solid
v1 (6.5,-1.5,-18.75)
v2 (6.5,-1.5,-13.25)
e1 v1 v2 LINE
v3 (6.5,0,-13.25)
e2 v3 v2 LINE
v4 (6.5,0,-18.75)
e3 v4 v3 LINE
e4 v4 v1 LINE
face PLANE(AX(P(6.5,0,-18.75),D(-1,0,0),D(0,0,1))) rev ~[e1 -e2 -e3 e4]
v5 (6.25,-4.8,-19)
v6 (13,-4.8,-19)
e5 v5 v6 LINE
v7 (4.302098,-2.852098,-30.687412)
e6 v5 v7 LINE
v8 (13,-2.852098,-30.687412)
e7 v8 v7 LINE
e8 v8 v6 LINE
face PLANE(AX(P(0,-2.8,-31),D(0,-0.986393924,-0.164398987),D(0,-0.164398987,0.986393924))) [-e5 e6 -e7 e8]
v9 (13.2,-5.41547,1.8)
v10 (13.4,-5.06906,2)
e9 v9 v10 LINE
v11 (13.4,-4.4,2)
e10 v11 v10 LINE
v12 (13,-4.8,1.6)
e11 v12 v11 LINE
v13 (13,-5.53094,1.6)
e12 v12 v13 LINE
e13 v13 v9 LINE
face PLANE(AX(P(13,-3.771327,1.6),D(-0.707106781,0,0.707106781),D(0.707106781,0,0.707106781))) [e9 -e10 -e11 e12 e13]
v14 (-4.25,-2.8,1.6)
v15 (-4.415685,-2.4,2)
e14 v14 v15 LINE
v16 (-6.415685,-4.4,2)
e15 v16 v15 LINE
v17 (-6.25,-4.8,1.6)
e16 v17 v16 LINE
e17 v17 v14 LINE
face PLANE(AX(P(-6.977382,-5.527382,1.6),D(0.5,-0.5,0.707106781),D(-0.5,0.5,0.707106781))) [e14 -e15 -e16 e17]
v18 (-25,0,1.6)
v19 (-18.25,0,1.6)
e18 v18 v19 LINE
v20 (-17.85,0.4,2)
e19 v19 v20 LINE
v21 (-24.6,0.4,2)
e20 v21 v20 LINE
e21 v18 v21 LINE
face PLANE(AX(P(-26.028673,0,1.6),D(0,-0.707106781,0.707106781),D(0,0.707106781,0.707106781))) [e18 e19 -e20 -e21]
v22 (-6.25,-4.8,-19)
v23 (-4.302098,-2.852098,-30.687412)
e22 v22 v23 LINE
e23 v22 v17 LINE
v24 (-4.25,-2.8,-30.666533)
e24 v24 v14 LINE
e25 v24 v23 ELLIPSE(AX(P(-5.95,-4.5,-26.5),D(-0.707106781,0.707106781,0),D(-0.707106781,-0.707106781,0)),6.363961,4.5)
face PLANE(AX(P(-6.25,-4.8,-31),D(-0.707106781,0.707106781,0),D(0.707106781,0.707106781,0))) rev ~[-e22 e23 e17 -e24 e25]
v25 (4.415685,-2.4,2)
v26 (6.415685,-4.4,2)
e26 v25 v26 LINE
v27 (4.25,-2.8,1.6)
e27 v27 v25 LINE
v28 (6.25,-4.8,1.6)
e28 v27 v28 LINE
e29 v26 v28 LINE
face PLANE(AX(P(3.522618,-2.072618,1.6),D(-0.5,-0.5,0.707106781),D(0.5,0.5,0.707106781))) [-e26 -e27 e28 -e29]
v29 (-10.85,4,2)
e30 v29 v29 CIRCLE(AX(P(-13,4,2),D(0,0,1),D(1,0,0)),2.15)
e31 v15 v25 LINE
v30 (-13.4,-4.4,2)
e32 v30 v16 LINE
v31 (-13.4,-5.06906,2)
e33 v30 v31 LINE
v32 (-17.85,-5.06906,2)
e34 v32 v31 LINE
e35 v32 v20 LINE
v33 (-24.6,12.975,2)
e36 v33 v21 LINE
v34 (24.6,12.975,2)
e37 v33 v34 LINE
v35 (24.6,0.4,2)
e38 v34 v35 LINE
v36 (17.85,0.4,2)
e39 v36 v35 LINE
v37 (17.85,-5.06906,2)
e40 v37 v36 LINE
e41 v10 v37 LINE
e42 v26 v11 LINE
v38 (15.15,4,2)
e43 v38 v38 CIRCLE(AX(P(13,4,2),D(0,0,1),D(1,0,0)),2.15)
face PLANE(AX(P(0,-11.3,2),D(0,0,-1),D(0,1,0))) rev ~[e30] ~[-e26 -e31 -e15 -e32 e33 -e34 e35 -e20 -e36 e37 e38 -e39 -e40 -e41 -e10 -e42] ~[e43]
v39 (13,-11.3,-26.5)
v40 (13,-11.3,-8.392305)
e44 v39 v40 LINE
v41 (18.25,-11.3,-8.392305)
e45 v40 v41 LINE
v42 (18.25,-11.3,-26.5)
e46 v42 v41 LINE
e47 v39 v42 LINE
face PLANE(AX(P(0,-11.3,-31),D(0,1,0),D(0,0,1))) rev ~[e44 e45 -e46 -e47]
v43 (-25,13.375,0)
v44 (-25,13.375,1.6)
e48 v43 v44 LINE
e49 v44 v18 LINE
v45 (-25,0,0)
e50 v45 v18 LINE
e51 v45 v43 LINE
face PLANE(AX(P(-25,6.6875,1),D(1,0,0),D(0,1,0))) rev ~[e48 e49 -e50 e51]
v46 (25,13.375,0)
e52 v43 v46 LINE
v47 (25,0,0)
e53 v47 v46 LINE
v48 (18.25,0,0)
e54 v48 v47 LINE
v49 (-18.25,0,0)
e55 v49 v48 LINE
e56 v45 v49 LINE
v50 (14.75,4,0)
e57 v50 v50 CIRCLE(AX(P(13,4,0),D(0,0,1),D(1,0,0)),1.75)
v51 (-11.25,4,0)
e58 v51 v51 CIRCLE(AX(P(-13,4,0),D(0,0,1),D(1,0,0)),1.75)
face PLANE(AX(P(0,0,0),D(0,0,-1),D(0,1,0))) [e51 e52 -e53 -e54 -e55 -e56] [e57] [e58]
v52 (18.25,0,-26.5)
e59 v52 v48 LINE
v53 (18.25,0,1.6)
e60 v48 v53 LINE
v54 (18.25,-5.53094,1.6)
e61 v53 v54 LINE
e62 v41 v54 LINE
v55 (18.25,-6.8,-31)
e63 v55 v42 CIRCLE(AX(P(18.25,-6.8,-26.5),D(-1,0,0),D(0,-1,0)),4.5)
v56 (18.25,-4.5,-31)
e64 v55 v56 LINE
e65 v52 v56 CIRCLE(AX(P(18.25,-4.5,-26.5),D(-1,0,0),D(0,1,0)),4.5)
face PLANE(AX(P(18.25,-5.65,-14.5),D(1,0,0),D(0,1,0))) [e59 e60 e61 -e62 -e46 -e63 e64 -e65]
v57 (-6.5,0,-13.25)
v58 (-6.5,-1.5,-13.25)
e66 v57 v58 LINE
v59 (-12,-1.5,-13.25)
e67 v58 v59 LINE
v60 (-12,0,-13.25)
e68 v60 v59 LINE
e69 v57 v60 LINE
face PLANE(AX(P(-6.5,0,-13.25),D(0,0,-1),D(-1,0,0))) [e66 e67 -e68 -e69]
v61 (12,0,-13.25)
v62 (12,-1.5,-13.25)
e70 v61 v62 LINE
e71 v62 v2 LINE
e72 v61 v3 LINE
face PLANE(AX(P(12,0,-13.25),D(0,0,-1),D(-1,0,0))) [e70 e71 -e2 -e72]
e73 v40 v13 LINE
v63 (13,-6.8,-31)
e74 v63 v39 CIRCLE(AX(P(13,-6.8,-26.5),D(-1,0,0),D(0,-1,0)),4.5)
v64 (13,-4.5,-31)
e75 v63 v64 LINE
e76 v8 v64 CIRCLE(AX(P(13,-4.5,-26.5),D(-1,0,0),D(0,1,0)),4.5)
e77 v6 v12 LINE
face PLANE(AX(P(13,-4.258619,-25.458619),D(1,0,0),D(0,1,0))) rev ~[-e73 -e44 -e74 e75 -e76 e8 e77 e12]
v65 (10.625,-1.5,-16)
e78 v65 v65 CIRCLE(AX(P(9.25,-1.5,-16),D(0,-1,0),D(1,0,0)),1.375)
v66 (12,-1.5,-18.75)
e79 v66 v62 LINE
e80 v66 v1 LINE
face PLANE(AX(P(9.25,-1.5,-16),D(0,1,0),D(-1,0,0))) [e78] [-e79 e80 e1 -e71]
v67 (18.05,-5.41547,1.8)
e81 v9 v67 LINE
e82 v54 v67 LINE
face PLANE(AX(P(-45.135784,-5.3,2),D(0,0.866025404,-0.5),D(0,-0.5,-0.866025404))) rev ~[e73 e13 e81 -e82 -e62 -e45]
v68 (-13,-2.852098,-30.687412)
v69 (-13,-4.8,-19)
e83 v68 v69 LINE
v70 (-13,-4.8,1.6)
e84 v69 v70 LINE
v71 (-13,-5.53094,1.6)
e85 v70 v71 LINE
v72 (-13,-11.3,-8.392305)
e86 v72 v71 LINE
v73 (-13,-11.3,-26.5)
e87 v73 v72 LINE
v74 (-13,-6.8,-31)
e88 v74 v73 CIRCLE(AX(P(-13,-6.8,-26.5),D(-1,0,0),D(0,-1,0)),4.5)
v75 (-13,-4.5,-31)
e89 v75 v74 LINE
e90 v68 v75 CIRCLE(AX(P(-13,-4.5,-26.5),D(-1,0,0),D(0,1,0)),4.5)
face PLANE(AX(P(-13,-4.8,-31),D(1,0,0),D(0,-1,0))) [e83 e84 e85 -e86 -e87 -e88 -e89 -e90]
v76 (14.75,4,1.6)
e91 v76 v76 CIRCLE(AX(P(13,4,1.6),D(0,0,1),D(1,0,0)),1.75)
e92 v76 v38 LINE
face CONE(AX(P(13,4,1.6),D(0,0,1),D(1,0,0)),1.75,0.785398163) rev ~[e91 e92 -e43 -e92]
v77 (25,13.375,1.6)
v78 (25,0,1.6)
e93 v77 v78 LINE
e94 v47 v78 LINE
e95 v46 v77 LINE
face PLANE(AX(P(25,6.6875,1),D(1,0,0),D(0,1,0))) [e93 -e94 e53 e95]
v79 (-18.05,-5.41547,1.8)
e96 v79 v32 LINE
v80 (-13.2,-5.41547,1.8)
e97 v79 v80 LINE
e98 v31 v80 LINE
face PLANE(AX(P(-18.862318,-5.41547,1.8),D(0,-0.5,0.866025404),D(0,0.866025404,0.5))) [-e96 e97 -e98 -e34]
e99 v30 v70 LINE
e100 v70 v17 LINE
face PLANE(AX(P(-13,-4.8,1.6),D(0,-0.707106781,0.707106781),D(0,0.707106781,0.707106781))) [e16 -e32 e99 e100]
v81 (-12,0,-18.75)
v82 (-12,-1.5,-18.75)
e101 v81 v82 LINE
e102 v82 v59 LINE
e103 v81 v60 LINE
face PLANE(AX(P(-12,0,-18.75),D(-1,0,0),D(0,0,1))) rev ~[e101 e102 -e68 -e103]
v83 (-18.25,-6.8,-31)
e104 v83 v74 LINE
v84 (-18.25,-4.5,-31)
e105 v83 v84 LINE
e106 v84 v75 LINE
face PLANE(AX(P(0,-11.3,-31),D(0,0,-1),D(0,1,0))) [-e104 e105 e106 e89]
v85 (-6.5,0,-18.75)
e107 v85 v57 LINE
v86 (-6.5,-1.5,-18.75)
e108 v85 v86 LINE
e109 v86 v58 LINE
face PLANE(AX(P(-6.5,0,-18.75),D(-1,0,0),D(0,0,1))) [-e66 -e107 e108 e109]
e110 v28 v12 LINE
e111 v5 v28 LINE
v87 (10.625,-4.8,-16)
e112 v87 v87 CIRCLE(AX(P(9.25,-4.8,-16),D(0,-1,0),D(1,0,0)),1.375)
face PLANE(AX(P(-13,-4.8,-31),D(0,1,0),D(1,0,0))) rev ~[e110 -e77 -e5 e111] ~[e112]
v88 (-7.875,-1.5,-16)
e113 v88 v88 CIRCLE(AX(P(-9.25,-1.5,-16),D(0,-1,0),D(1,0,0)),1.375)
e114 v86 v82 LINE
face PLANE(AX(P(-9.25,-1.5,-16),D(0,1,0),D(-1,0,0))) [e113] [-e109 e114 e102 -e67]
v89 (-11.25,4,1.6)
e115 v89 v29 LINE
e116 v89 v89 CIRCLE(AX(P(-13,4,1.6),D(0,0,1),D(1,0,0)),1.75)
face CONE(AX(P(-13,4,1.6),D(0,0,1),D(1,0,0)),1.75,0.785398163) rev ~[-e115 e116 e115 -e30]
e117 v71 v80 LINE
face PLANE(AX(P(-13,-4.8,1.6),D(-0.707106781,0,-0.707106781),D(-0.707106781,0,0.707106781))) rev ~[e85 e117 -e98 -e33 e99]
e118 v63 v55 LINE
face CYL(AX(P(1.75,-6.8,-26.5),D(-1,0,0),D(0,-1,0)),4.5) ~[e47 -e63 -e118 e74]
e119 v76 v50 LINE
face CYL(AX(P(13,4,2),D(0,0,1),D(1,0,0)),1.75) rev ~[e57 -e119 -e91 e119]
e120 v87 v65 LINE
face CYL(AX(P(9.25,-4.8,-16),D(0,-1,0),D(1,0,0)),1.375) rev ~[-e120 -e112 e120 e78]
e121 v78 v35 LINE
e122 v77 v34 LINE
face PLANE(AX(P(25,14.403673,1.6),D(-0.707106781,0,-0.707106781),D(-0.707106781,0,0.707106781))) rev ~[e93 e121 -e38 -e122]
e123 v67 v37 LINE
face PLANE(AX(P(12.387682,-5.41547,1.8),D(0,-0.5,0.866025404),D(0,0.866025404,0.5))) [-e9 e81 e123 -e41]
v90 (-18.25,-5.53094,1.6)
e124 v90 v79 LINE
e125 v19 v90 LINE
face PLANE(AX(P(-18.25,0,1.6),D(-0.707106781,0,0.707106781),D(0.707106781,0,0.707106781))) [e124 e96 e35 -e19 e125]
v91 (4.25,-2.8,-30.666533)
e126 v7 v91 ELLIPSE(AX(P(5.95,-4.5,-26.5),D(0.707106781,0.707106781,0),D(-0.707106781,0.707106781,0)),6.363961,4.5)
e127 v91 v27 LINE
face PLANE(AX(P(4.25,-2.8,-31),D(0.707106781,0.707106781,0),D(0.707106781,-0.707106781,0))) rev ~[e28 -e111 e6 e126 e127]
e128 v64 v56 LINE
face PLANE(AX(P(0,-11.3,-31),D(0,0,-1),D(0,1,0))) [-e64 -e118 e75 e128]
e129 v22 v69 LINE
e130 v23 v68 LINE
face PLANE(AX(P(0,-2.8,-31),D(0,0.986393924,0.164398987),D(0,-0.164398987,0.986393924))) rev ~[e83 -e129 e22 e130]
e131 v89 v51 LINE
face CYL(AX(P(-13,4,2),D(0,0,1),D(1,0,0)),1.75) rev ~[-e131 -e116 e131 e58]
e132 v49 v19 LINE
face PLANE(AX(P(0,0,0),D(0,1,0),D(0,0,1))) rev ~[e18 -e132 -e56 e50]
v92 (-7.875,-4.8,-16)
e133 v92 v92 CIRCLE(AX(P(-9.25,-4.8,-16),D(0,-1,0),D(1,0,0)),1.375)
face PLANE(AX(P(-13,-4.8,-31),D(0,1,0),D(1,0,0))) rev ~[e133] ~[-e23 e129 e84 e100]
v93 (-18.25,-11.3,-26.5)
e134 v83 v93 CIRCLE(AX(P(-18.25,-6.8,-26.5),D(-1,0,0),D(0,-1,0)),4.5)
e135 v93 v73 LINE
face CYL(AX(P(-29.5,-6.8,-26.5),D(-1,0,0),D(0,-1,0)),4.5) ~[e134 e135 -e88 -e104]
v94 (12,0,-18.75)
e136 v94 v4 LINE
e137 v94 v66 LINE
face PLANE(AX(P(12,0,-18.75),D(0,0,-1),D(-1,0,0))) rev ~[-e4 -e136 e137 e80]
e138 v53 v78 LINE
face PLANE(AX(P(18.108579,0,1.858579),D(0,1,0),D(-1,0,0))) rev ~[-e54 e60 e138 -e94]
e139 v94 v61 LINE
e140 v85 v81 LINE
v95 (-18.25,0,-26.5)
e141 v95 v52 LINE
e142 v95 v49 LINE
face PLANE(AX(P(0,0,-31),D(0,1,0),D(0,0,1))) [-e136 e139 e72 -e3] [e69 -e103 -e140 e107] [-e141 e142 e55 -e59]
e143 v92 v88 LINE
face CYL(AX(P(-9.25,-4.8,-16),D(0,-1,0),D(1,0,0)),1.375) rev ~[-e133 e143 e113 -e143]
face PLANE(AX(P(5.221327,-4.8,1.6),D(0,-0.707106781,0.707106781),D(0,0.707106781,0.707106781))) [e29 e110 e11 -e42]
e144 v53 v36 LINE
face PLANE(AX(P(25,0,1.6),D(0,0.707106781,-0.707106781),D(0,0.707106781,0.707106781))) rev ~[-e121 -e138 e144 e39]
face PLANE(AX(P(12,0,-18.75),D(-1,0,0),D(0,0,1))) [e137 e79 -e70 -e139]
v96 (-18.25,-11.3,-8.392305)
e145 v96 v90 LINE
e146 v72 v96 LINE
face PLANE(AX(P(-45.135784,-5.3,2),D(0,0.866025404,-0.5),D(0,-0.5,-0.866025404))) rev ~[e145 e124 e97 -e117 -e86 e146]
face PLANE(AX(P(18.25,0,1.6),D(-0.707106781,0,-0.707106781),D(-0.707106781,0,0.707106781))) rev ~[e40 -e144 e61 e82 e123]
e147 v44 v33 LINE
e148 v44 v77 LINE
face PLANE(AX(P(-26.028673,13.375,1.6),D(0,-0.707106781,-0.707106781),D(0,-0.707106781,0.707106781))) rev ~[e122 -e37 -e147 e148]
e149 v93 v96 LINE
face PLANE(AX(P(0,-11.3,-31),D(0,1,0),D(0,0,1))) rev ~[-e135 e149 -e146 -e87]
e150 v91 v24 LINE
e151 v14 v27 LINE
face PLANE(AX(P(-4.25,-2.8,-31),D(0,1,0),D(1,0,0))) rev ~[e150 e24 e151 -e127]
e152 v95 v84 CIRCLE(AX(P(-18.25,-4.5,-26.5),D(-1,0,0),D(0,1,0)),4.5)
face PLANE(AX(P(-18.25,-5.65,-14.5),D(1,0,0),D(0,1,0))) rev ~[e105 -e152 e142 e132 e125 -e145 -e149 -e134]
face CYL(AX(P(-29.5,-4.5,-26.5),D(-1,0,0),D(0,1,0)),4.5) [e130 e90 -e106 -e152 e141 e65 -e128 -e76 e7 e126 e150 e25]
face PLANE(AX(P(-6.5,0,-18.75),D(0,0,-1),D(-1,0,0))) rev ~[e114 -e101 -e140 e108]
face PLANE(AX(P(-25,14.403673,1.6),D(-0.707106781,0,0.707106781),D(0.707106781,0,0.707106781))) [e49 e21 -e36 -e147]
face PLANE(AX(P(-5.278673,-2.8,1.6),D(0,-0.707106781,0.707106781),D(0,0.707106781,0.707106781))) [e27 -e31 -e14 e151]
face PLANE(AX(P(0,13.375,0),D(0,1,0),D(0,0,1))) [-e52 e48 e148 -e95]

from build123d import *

# Parameters (mm, degrees)
F0_W           = 13.375
F0_H           = 2
F1_DEPTH       = 25
F2_R           = 1.75
F3_DEPTH       = 2
F4_W           = 11.3
F4_H           = 33
F5_DEPTH       = 18.25
F6_W           = 26
F6_H           = 6.5
F7_DEPTH       = 33
F9_DEPTH       = 33
F11_DEPTH      = 13
F11_DEPTH_BACK = 13
F12_R          = 1.375
F13_DEPTH      = 4.8
F14_W          = 5.5
F14_H          = 5.5
F15_DEPTH      = 1.5
F16_T1_DEPTH   = 27.75
F16_T3_DEPTH   = 27.75
F16_T5_DEPTH   = 59
F17_T1_DEPTH   = 59.021567647
F17_T3_DEPTH   = 59.021567647
F18_T1_DEPTH   = 15.4323463904
F18_T3_DEPTH   = 52.0573463904
F18_T5_DEPTH   = 7.7786731952
F18_T7_DEPTH   = 6.3286731952
F18_T9_DEPTH   = 6.4746360003
F18_T11_DEPTH  = 1.5286731952
F18_T13_DEPTH  = 7.7786731952
F18_T15_DEPTH  = 7.7786731952
F18_T17_DEPTH  = 6.4746360003
F18_T19_DEPTH  = 7.7786731952
F18_T24_DEPTH  = 4.8857735151
F18_T29_DEPTH  = 10.5573463904
F18_T35_DEPTH  = 4.8857735151
F18_T45_DEPTH  = 7.7786731952
F18_T49_DEPTH  = 7.3573463904
F18_T56_DEPTH  = 2.5573463904
F18_T60_DEPTH  = 8.8073463904
F18_T67_DEPTH  = 10.5573463904
F18_T71_DEPTH  = 4.8857735151
F18_T78_DEPTH  = 4.8857735151
F18_T82_DEPTH  = 10.5573463904
F18_T89_DEPTH  = 2.5573463904
F18_T93_DEPTH  = 8.8073463904
F18_T100_DEPTH = 7.7786731952
F18_T104_DEPTH = 7.3573463904


# Not quite as in the source:
# - a fillet or chamfer that OpenCascade refuses, or shapes differently, is made with other operations: its cross-section is extruded or revolved along the edge and cut away or added


with BuildPart() as f1:
    # F0 (on Right) → F1 (new body, symmetric)
    with BuildSketch(Plane.YZ):
        with Locations((6.6875, 1)):
            Rectangle(F0_W, F0_H)
    extrude(amount=F1_DEPTH, both=True)

    # F2 (on face) → F3 (cut, through all)
    with BuildSketch(Plane.XY.offset(2)):
        with Locations((-13, 4)):
            Circle(F2_R)
        with Locations((13, 4)):
            Circle(F2_R)
    extrude(amount=-F3_DEPTH, mode=Mode.SUBTRACT)

    # F4 (on Right) → F5 (join, symmetric)
    with BuildSketch(Plane.YZ):
        with Locations((-5.65, -14.5)):
            Rectangle(F4_W, F4_H)
    extrude(amount=F5_DEPTH, both=True)

    # F6 (on face) → F7 (cut, through all)
    with BuildSketch(Plane(origin=(0, 0, -31), x_dir=(1, 0, 0), z_dir=(0, 0, -1))):
        with Locations((0, 8.05)):
            Rectangle(F6_W, F6_H)
    extrude(amount=-F7_DEPTH, mode=Mode.SUBTRACT)

    # F8 (on face) → F9 (cut, through all)
    with BuildSketch(Plane(origin=(0, 0, -31), x_dir=(1, 0, 0), z_dir=(0, 0, -1))):
        Polygon((6.25, 4.8), (-6.25, 4.8), (-4.25, 2.8), (4.25, 2.8), align=None)
    extrude(amount=-F9_DEPTH, mode=Mode.SUBTRACT)

    # F10 (on Right) → F11 (cut, two sides)
    with BuildSketch(Plane.YZ) as f11_sk:
        Polygon((-4.8, -31), (-2.8, -31), (-4.8, -19), align=None)
    extrude(amount=F11_DEPTH, mode=Mode.SUBTRACT)
    extrude(f11_sk.sketch, amount=-F11_DEPTH_BACK, mode=Mode.SUBTRACT)

    # F12 (on face) → F13 (cut, through all)
    with BuildSketch(Plane.XZ.offset(4.8)):
        with Locations((-9.25, -16)):
            Circle(F12_R)
        with Locations((9.25, -16)):
            Circle(F12_R)
    extrude(amount=-F13_DEPTH, mode=Mode.SUBTRACT)

    # F14 (on face) → F15 (cut)
    with BuildSketch(Plane(origin=(0, 0, 0), x_dir=(-1, 0, 0), z_dir=(0, 1, 0))):
        with Locations((-9.25, -16)):
            Rectangle(F14_W, F14_H)
        with Locations((9.25, -16)):
            Rectangle(F14_W, F14_H)
    extrude(amount=-F15_DEPTH, mode=Mode.SUBTRACT)

    # F16: fillet of radius 4.5 on 3 edges, made by hand

    # F16_s2 → F16_t1 (cut)
    with BuildSketch(Plane.YZ.offset(-29.5)):
        with BuildLine():
            ThreePointArc((-11.3, -26.5), (-9.9819805153, -29.6819805153), (-6.8, -31))
            Line((-6.8, -31), (-11.3, -31))
            Line((-11.3, -31), (-11.3, -26.5))
        make_face()
    extrude(amount=F16_T1_DEPTH, mode=Mode.SUBTRACT)

    # F16_s4 → F16_t3 (cut)
    with BuildSketch(Plane.YZ.offset(1.75)):
        with BuildLine():
            ThreePointArc((-11.3, -26.5), (-9.9819805153, -29.6819805153), (-6.8, -31))
            Line((-6.8, -31), (-11.3, -31))
            Line((-11.3, -31), (-11.3, -26.5))
        make_face()
    extrude(amount=F16_T3_DEPTH, mode=Mode.SUBTRACT)

    # F16_s6 → F16_t5 (cut)
    with BuildSketch(Plane.YZ.offset(-29.5)):
        with BuildLine():
            ThreePointArc((0, -26.5), (-1.3180194847, -29.6819805153), (-4.5, -31))
            Line((-4.5, -31), (0, -31))
            Line((0, -31), (0, -26.5))
        make_face()
    extrude(amount=F16_T5_DEPTH, mode=Mode.SUBTRACT)

    # F17: chamfer of 6 x 10.3923048454 on 2 edges, made by hand

    # F17_s2 → F17_t1 (cut)
    with BuildSketch(Plane.YZ.offset(-45.1357838235)):
        Polygon((-5.3, 2), (-11.3, -8.3923048454), (-11.3, 2), align=None)
    extrude(amount=F17_T1_DEPTH, mode=Mode.SUBTRACT)

    # F17_s4 → F17_t3 (cut)
    with BuildSketch(Plane.YZ.offset(-13.8857838235)):
        Polygon((-5.3, 2), (-11.3, -8.3923048454), (-11.3, 2), align=None)
    extrude(amount=F17_T3_DEPTH, mode=Mode.SUBTRACT)

    # F18: chamfer of 0.4 on 18 edges, made by hand

    # F18_s2 → F18_t1 (cut)
    with BuildSketch(Plane.XZ.offset(-14.4036731952)):
        Polygon((25, 1.6), (24.6, 2), (25, 2), align=None)
        Polygon((-25, 1.6), (-24.6, 2), (-25, 2), align=None)
    extrude(amount=F18_T1_DEPTH, mode=Mode.SUBTRACT)

    # F18_s4 → F18_t3 (cut)
    with BuildSketch(Plane.YZ.offset(-26.0286731952)):
        Polygon((13.375, 1.6), (12.975, 2), (13.375, 2), align=None)
    extrude(amount=F18_T3_DEPTH, mode=Mode.SUBTRACT)

    # F18_s6 → F18_t5 (cut)
    with BuildSketch(Plane.YZ.offset(-26.0286731952)):
        Polygon((0, 1.6), (0.4, 2), (0, 2), align=None)
    extrude(amount=F18_T5_DEPTH, mode=Mode.SUBTRACT)

    # F18_s8 → F18_t7 (cut)
    with BuildSketch(Plane.XZ):
        Polygon((-18.25, 1.6), (-17.85, 2), (-18.25, 2), align=None)
        Polygon((18.25, 1.6), (17.85, 2), (18.25, 2), align=None)
    extrude(amount=F18_T7_DEPTH, mode=Mode.SUBTRACT)

    # F18_s10 → F18_t9 (cut)
    with BuildSketch(Plane.YZ.offset(-18.8623180002)):
        Polygon((-5.4154700538, 1.8), (-5.0690598923, 2), (-5.3, 2), align=None)
    extrude(amount=F18_T9_DEPTH, mode=Mode.SUBTRACT)

    # F18_s12 → F18_t11 (cut)
    with BuildSketch(Plane.XZ.offset(4.8)):
        Polygon((-13, 1.6), (-13.4, 2), (-13, 2), align=None)
        Polygon((13, 1.6), (13.4, 2), (13, 2), align=None)
    extrude(amount=F18_T11_DEPTH, mode=Mode.SUBTRACT)

    # F18_s14 → F18_t13 (cut)
    with BuildSketch(Plane.YZ.offset(-13)):
        Polygon((-4.8, 1.6), (-4.4, 2), (-4.8, 2), align=None)
    extrude(amount=F18_T13_DEPTH, mode=Mode.SUBTRACT)

    # F18_s16 → F18_t15 (cut)
    with BuildSketch(Plane.YZ.offset(5.2213268048)):
        Polygon((-4.8, 1.6), (-4.4, 2), (-4.8, 2), align=None)
    extrude(amount=F18_T15_DEPTH, mode=Mode.SUBTRACT)

    # F18_s18 → F18_t17 (cut)
    with BuildSketch(Plane.YZ.offset(12.3876819998)):
        Polygon((-5.4154700538, 1.8), (-5.0690598923, 2), (-5.3, 2), align=None)
    extrude(amount=F18_T17_DEPTH, mode=Mode.SUBTRACT)

    # F18_s20 → F18_t19 (cut)
    with BuildSketch(Plane.YZ.offset(18.25)):
        Polygon((0, 1.6), (0.4, 2), (0, 2), align=None)
    extrude(amount=F18_T19_DEPTH, mode=Mode.SUBTRACT)


with BuildPart() as f18_tool22:
    # F18_s23 → F18_t24 (new body)
    with BuildSketch(Plane(origin=(-6.2523817919, -6.2523817919, 0), x_dir=(0, 0, 1), z_dir=(0.7071067812, 0.7071067812, 0))):
        Polygon((1.6, -1.0253048327), (2, -1.4253048327), (2, -1.0253048327), align=None)
    extrude(amount=F18_T24_DEPTH)

    split(bisect_by=Plane.XZ.offset(2.8), keep=Keep.TOP)


with BuildPart() as f1_1:
    add(f1.part)

    # F18_t21: cut F18_tool22
    add(f18_tool22.part, mode=Mode.SUBTRACT)


with BuildPart() as f18_tool27:
    # F18_s28 → F18_t29 (new body)
    with BuildSketch(Plane.YZ.offset(-5.2786731952)):
        Polygon((-2.8, 1.6), (-2.4, 2), (-2.8, 2), align=None)
    extrude(amount=F18_T29_DEPTH)

    split(bisect_by=Plane(origin=(0.725, 0.725, 0), x_dir=(0, 0, 1), z_dir=(-0.7071067812, -0.7071067812, 0)), keep=Keep.TOP)

    split(bisect_by=Plane(origin=(-0.725, 0.725, 0), x_dir=(0, 0, 1), z_dir=(0.7071067812, -0.7071067812, 0)), keep=Keep.TOP)


with BuildPart() as f1_2:
    add(f1_1.part)

    # F18_t26: cut F18_tool27
    add(f18_tool27.part, mode=Mode.SUBTRACT)


with BuildPart() as f18_tool33:
    # F18_s34 → F18_t35 (new body)
    with BuildSketch(Plane(origin=(2.7976182081, -2.7976182081, 0), x_dir=(0, 0, 1), z_dir=(0.7071067812, -0.7071067812, 0))):
        Polygon((1.6, -1.0253048327), (2, -1.4253048327), (2, -1.0253048327), align=None)
    extrude(amount=F18_T35_DEPTH)

    split(bisect_by=Plane.XZ.offset(2.8), keep=Keep.TOP)


with BuildPart() as f1_3:
    add(f1_2.part)

    # F18_t32: cut F18_tool33
    add(f18_tool33.part, mode=Mode.SUBTRACT)

    # F18_s37 → F18_t38 (revolve, cut)
    with BuildSketch(Plane.XZ.offset(-4)):
        Polygon((-11.25, 1.6), (-10.85, 2), (-11.25, 2), align=None)
    revolve(axis=Axis((-13, 4, 2), (0, 0, 1)), mode=Mode.SUBTRACT)

    # F18_s39 → F18_t40 (revolve, cut)
    with BuildSketch(Plane.XZ.offset(-4)):
        Polygon((14.75, 1.6), (15.15, 2), (14.75, 2), align=None)
    revolve(axis=Axis((13, 4, 2), (0, 0, 1)), mode=Mode.SUBTRACT)


with BuildPart() as f18_tool43:
    # F18_s44 → F18_t45 (new body)
    with BuildSketch(Plane.YZ.offset(-17.2213268048)):
        Polygon((0, 1.6), (0.4, 2), (0, 2), align=None)
    extrude(amount=-F18_T45_DEPTH)

    split(bisect_by=Plane.YZ.offset(-18.25), keep=Keep.TOP)


with BuildPart() as f18_tool47:
    # F18_s48 → F18_t49 (new body)
    with BuildSketch(Plane.XZ.offset(-1.0286731952)):
        Polygon((-18.25, 1.6), (-17.85, 2), (-18.25, 2), align=None)
    extrude(amount=F18_T49_DEPTH)

    split(bisect_by=Plane.XZ, keep=Keep.BOTTOM)


with BuildPart() as f18_tool43_1:
    add(f18_tool43.part)

    # F18_t51: intersect F18_tool47
    add(f18_tool47.part, mode=Mode.INTERSECT)


with BuildPart() as f1_4:
    add(f1_3.part)

    # F18_t41: cut F18_tool43
    add(f18_tool43_1.part, mode=Mode.SUBTRACT)


with BuildPart() as f18_tool54:
    # F18_s55 → F18_t56 (new body)
    with BuildSketch(Plane.XZ.offset(6.3286731952)):
        Polygon((-13, 1.6), (-13.4, 2), (-13, 2), align=None)
    extrude(amount=-F18_T56_DEPTH)

    split(bisect_by=Plane.XZ.offset(4.8), keep=Keep.BOTTOM)


with BuildPart() as f18_tool58:
    # F18_s59 → F18_t60 (new body)
    with BuildSketch(Plane.YZ.offset(-14.0286731952)):
        Polygon((-4.8, 1.6), (-4.4, 2), (-4.8, 2), align=None)
    extrude(amount=F18_T60_DEPTH)

    split(bisect_by=Plane.YZ.offset(-13), keep=Keep.BOTTOM)


with BuildPart() as f18_tool54_1:
    add(f18_tool54.part)

    # F18_t62: intersect F18_tool58
    add(f18_tool58.part, mode=Mode.INTERSECT)


with BuildPart() as f1_5:
    add(f1_4.part)

    # F18_t52: cut F18_tool54
    add(f18_tool54_1.part, mode=Mode.SUBTRACT)


with BuildPart() as f18_tool65:
    # F18_s66 → F18_t67 (new body)
    with BuildSketch(Plane.YZ.offset(-5.2786731952)):
        Polygon((-2.8, 1.6), (-2.4, 2), (-2.8, 2), align=None)
    extrude(amount=F18_T67_DEPTH)

    split(bisect_by=Plane(origin=(-0.725, 0.725, 0), x_dir=(0, 0, 1), z_dir=(-0.7071067812, 0.7071067812, 0)), keep=Keep.TOP)


with BuildPart() as f18_tool69:
    # F18_s70 → F18_t71 (new body)
    with BuildSketch(Plane(origin=(-6.2523817919, -6.2523817919, 0), x_dir=(0, 0, 1), z_dir=(0.7071067812, 0.7071067812, 0))):
        Polygon((1.6, -1.0253048327), (2, -1.4253048327), (2, -1.0253048327), align=None)
    extrude(amount=F18_T71_DEPTH)

    split(bisect_by=Plane.XZ.offset(2.8), keep=Keep.BOTTOM)


with BuildPart() as f18_tool65_1:
    add(f18_tool65.part)

    # F18_t73: intersect F18_tool69
    add(f18_tool69.part, mode=Mode.INTERSECT)


with BuildPart() as f1_6:
    add(f1_5.part)

    # F18_t63: cut F18_tool65
    add(f18_tool65_1.part, mode=Mode.SUBTRACT)


with BuildPart() as f18_tool76:
    # F18_s77 → F18_t78 (new body)
    with BuildSketch(Plane(origin=(2.7976182081, -2.7976182081, 0), x_dir=(0, 0, 1), z_dir=(0.7071067812, -0.7071067812, 0))):
        Polygon((1.6, -1.0253048327), (2, -1.4253048327), (2, -1.0253048327), align=None)
    extrude(amount=F18_T78_DEPTH)

    split(bisect_by=Plane.XZ.offset(2.8), keep=Keep.BOTTOM)


with BuildPart() as f18_tool80:
    # F18_s81 → F18_t82 (new body)
    with BuildSketch(Plane.YZ.offset(-5.2786731952)):
        Polygon((-2.8, 1.6), (-2.4, 2), (-2.8, 2), align=None)
    extrude(amount=F18_T82_DEPTH)

    split(bisect_by=Plane(origin=(0.725, 0.725, 0), x_dir=(0, 0, 1), z_dir=(0.7071067812, 0.7071067812, 0)), keep=Keep.TOP)


with BuildPart() as f18_tool76_1:
    add(f18_tool76.part)

    # F18_t84: intersect F18_tool80
    add(f18_tool80.part, mode=Mode.INTERSECT)


with BuildPart() as f1_7:
    add(f1_6.part)

    # F18_t74: cut F18_tool76
    add(f18_tool76_1.part, mode=Mode.SUBTRACT)


with BuildPart() as f18_tool87:
    # F18_s88 → F18_t89 (new body)
    with BuildSketch(Plane.XZ.offset(3.7713268048)):
        Polygon((13, 1.6), (13.4, 2), (13, 2), align=None)
    extrude(amount=F18_T89_DEPTH)

    split(bisect_by=Plane.XZ.offset(4.8), keep=Keep.BOTTOM)


with BuildPart() as f18_tool91:
    # F18_s92 → F18_t93 (new body)
    with BuildSketch(Plane.YZ.offset(5.2213268048)):
        Polygon((-4.8, 1.6), (-4.4, 2), (-4.8, 2), align=None)
    extrude(amount=F18_T93_DEPTH)

    split(bisect_by=Plane.YZ.offset(13), keep=Keep.TOP)


with BuildPart() as f18_tool87_1:
    add(f18_tool87.part)

    # F18_t95: intersect F18_tool91
    add(f18_tool91.part, mode=Mode.INTERSECT)


with BuildPart() as f1_8:
    add(f1_7.part)

    # F18_t85: cut F18_tool87
    add(f18_tool87_1.part, mode=Mode.SUBTRACT)


with BuildPart() as f18_tool98:
    # F18_s99 → F18_t100 (new body)
    with BuildSketch(Plane.YZ.offset(25)):
        Polygon((0, 1.6), (0.4, 2), (0, 2), align=None)
    extrude(amount=-F18_T100_DEPTH)

    split(bisect_by=Plane.YZ.offset(18.25), keep=Keep.BOTTOM)


with BuildPart() as f18_tool102:
    # F18_s103 → F18_t104 (new body)
    with BuildSketch(Plane.XZ.offset(-1.0286731952)):
        Polygon((18.25, 1.6), (17.85, 2), (18.25, 2), align=None)
    extrude(amount=F18_T104_DEPTH)

    split(bisect_by=Plane.XZ, keep=Keep.BOTTOM)


with BuildPart() as f18_tool98_1:
    add(f18_tool98.part)

    # F18_t106: intersect F18_tool102
    add(f18_tool102.part, mode=Mode.INTERSECT)


with BuildPart() as f1_9:
    add(f1_8.part)

    # F18_t96: cut F18_tool98
    add(f18_tool98_1.part, mode=Mode.SUBTRACT)


solid = f1_9.part
